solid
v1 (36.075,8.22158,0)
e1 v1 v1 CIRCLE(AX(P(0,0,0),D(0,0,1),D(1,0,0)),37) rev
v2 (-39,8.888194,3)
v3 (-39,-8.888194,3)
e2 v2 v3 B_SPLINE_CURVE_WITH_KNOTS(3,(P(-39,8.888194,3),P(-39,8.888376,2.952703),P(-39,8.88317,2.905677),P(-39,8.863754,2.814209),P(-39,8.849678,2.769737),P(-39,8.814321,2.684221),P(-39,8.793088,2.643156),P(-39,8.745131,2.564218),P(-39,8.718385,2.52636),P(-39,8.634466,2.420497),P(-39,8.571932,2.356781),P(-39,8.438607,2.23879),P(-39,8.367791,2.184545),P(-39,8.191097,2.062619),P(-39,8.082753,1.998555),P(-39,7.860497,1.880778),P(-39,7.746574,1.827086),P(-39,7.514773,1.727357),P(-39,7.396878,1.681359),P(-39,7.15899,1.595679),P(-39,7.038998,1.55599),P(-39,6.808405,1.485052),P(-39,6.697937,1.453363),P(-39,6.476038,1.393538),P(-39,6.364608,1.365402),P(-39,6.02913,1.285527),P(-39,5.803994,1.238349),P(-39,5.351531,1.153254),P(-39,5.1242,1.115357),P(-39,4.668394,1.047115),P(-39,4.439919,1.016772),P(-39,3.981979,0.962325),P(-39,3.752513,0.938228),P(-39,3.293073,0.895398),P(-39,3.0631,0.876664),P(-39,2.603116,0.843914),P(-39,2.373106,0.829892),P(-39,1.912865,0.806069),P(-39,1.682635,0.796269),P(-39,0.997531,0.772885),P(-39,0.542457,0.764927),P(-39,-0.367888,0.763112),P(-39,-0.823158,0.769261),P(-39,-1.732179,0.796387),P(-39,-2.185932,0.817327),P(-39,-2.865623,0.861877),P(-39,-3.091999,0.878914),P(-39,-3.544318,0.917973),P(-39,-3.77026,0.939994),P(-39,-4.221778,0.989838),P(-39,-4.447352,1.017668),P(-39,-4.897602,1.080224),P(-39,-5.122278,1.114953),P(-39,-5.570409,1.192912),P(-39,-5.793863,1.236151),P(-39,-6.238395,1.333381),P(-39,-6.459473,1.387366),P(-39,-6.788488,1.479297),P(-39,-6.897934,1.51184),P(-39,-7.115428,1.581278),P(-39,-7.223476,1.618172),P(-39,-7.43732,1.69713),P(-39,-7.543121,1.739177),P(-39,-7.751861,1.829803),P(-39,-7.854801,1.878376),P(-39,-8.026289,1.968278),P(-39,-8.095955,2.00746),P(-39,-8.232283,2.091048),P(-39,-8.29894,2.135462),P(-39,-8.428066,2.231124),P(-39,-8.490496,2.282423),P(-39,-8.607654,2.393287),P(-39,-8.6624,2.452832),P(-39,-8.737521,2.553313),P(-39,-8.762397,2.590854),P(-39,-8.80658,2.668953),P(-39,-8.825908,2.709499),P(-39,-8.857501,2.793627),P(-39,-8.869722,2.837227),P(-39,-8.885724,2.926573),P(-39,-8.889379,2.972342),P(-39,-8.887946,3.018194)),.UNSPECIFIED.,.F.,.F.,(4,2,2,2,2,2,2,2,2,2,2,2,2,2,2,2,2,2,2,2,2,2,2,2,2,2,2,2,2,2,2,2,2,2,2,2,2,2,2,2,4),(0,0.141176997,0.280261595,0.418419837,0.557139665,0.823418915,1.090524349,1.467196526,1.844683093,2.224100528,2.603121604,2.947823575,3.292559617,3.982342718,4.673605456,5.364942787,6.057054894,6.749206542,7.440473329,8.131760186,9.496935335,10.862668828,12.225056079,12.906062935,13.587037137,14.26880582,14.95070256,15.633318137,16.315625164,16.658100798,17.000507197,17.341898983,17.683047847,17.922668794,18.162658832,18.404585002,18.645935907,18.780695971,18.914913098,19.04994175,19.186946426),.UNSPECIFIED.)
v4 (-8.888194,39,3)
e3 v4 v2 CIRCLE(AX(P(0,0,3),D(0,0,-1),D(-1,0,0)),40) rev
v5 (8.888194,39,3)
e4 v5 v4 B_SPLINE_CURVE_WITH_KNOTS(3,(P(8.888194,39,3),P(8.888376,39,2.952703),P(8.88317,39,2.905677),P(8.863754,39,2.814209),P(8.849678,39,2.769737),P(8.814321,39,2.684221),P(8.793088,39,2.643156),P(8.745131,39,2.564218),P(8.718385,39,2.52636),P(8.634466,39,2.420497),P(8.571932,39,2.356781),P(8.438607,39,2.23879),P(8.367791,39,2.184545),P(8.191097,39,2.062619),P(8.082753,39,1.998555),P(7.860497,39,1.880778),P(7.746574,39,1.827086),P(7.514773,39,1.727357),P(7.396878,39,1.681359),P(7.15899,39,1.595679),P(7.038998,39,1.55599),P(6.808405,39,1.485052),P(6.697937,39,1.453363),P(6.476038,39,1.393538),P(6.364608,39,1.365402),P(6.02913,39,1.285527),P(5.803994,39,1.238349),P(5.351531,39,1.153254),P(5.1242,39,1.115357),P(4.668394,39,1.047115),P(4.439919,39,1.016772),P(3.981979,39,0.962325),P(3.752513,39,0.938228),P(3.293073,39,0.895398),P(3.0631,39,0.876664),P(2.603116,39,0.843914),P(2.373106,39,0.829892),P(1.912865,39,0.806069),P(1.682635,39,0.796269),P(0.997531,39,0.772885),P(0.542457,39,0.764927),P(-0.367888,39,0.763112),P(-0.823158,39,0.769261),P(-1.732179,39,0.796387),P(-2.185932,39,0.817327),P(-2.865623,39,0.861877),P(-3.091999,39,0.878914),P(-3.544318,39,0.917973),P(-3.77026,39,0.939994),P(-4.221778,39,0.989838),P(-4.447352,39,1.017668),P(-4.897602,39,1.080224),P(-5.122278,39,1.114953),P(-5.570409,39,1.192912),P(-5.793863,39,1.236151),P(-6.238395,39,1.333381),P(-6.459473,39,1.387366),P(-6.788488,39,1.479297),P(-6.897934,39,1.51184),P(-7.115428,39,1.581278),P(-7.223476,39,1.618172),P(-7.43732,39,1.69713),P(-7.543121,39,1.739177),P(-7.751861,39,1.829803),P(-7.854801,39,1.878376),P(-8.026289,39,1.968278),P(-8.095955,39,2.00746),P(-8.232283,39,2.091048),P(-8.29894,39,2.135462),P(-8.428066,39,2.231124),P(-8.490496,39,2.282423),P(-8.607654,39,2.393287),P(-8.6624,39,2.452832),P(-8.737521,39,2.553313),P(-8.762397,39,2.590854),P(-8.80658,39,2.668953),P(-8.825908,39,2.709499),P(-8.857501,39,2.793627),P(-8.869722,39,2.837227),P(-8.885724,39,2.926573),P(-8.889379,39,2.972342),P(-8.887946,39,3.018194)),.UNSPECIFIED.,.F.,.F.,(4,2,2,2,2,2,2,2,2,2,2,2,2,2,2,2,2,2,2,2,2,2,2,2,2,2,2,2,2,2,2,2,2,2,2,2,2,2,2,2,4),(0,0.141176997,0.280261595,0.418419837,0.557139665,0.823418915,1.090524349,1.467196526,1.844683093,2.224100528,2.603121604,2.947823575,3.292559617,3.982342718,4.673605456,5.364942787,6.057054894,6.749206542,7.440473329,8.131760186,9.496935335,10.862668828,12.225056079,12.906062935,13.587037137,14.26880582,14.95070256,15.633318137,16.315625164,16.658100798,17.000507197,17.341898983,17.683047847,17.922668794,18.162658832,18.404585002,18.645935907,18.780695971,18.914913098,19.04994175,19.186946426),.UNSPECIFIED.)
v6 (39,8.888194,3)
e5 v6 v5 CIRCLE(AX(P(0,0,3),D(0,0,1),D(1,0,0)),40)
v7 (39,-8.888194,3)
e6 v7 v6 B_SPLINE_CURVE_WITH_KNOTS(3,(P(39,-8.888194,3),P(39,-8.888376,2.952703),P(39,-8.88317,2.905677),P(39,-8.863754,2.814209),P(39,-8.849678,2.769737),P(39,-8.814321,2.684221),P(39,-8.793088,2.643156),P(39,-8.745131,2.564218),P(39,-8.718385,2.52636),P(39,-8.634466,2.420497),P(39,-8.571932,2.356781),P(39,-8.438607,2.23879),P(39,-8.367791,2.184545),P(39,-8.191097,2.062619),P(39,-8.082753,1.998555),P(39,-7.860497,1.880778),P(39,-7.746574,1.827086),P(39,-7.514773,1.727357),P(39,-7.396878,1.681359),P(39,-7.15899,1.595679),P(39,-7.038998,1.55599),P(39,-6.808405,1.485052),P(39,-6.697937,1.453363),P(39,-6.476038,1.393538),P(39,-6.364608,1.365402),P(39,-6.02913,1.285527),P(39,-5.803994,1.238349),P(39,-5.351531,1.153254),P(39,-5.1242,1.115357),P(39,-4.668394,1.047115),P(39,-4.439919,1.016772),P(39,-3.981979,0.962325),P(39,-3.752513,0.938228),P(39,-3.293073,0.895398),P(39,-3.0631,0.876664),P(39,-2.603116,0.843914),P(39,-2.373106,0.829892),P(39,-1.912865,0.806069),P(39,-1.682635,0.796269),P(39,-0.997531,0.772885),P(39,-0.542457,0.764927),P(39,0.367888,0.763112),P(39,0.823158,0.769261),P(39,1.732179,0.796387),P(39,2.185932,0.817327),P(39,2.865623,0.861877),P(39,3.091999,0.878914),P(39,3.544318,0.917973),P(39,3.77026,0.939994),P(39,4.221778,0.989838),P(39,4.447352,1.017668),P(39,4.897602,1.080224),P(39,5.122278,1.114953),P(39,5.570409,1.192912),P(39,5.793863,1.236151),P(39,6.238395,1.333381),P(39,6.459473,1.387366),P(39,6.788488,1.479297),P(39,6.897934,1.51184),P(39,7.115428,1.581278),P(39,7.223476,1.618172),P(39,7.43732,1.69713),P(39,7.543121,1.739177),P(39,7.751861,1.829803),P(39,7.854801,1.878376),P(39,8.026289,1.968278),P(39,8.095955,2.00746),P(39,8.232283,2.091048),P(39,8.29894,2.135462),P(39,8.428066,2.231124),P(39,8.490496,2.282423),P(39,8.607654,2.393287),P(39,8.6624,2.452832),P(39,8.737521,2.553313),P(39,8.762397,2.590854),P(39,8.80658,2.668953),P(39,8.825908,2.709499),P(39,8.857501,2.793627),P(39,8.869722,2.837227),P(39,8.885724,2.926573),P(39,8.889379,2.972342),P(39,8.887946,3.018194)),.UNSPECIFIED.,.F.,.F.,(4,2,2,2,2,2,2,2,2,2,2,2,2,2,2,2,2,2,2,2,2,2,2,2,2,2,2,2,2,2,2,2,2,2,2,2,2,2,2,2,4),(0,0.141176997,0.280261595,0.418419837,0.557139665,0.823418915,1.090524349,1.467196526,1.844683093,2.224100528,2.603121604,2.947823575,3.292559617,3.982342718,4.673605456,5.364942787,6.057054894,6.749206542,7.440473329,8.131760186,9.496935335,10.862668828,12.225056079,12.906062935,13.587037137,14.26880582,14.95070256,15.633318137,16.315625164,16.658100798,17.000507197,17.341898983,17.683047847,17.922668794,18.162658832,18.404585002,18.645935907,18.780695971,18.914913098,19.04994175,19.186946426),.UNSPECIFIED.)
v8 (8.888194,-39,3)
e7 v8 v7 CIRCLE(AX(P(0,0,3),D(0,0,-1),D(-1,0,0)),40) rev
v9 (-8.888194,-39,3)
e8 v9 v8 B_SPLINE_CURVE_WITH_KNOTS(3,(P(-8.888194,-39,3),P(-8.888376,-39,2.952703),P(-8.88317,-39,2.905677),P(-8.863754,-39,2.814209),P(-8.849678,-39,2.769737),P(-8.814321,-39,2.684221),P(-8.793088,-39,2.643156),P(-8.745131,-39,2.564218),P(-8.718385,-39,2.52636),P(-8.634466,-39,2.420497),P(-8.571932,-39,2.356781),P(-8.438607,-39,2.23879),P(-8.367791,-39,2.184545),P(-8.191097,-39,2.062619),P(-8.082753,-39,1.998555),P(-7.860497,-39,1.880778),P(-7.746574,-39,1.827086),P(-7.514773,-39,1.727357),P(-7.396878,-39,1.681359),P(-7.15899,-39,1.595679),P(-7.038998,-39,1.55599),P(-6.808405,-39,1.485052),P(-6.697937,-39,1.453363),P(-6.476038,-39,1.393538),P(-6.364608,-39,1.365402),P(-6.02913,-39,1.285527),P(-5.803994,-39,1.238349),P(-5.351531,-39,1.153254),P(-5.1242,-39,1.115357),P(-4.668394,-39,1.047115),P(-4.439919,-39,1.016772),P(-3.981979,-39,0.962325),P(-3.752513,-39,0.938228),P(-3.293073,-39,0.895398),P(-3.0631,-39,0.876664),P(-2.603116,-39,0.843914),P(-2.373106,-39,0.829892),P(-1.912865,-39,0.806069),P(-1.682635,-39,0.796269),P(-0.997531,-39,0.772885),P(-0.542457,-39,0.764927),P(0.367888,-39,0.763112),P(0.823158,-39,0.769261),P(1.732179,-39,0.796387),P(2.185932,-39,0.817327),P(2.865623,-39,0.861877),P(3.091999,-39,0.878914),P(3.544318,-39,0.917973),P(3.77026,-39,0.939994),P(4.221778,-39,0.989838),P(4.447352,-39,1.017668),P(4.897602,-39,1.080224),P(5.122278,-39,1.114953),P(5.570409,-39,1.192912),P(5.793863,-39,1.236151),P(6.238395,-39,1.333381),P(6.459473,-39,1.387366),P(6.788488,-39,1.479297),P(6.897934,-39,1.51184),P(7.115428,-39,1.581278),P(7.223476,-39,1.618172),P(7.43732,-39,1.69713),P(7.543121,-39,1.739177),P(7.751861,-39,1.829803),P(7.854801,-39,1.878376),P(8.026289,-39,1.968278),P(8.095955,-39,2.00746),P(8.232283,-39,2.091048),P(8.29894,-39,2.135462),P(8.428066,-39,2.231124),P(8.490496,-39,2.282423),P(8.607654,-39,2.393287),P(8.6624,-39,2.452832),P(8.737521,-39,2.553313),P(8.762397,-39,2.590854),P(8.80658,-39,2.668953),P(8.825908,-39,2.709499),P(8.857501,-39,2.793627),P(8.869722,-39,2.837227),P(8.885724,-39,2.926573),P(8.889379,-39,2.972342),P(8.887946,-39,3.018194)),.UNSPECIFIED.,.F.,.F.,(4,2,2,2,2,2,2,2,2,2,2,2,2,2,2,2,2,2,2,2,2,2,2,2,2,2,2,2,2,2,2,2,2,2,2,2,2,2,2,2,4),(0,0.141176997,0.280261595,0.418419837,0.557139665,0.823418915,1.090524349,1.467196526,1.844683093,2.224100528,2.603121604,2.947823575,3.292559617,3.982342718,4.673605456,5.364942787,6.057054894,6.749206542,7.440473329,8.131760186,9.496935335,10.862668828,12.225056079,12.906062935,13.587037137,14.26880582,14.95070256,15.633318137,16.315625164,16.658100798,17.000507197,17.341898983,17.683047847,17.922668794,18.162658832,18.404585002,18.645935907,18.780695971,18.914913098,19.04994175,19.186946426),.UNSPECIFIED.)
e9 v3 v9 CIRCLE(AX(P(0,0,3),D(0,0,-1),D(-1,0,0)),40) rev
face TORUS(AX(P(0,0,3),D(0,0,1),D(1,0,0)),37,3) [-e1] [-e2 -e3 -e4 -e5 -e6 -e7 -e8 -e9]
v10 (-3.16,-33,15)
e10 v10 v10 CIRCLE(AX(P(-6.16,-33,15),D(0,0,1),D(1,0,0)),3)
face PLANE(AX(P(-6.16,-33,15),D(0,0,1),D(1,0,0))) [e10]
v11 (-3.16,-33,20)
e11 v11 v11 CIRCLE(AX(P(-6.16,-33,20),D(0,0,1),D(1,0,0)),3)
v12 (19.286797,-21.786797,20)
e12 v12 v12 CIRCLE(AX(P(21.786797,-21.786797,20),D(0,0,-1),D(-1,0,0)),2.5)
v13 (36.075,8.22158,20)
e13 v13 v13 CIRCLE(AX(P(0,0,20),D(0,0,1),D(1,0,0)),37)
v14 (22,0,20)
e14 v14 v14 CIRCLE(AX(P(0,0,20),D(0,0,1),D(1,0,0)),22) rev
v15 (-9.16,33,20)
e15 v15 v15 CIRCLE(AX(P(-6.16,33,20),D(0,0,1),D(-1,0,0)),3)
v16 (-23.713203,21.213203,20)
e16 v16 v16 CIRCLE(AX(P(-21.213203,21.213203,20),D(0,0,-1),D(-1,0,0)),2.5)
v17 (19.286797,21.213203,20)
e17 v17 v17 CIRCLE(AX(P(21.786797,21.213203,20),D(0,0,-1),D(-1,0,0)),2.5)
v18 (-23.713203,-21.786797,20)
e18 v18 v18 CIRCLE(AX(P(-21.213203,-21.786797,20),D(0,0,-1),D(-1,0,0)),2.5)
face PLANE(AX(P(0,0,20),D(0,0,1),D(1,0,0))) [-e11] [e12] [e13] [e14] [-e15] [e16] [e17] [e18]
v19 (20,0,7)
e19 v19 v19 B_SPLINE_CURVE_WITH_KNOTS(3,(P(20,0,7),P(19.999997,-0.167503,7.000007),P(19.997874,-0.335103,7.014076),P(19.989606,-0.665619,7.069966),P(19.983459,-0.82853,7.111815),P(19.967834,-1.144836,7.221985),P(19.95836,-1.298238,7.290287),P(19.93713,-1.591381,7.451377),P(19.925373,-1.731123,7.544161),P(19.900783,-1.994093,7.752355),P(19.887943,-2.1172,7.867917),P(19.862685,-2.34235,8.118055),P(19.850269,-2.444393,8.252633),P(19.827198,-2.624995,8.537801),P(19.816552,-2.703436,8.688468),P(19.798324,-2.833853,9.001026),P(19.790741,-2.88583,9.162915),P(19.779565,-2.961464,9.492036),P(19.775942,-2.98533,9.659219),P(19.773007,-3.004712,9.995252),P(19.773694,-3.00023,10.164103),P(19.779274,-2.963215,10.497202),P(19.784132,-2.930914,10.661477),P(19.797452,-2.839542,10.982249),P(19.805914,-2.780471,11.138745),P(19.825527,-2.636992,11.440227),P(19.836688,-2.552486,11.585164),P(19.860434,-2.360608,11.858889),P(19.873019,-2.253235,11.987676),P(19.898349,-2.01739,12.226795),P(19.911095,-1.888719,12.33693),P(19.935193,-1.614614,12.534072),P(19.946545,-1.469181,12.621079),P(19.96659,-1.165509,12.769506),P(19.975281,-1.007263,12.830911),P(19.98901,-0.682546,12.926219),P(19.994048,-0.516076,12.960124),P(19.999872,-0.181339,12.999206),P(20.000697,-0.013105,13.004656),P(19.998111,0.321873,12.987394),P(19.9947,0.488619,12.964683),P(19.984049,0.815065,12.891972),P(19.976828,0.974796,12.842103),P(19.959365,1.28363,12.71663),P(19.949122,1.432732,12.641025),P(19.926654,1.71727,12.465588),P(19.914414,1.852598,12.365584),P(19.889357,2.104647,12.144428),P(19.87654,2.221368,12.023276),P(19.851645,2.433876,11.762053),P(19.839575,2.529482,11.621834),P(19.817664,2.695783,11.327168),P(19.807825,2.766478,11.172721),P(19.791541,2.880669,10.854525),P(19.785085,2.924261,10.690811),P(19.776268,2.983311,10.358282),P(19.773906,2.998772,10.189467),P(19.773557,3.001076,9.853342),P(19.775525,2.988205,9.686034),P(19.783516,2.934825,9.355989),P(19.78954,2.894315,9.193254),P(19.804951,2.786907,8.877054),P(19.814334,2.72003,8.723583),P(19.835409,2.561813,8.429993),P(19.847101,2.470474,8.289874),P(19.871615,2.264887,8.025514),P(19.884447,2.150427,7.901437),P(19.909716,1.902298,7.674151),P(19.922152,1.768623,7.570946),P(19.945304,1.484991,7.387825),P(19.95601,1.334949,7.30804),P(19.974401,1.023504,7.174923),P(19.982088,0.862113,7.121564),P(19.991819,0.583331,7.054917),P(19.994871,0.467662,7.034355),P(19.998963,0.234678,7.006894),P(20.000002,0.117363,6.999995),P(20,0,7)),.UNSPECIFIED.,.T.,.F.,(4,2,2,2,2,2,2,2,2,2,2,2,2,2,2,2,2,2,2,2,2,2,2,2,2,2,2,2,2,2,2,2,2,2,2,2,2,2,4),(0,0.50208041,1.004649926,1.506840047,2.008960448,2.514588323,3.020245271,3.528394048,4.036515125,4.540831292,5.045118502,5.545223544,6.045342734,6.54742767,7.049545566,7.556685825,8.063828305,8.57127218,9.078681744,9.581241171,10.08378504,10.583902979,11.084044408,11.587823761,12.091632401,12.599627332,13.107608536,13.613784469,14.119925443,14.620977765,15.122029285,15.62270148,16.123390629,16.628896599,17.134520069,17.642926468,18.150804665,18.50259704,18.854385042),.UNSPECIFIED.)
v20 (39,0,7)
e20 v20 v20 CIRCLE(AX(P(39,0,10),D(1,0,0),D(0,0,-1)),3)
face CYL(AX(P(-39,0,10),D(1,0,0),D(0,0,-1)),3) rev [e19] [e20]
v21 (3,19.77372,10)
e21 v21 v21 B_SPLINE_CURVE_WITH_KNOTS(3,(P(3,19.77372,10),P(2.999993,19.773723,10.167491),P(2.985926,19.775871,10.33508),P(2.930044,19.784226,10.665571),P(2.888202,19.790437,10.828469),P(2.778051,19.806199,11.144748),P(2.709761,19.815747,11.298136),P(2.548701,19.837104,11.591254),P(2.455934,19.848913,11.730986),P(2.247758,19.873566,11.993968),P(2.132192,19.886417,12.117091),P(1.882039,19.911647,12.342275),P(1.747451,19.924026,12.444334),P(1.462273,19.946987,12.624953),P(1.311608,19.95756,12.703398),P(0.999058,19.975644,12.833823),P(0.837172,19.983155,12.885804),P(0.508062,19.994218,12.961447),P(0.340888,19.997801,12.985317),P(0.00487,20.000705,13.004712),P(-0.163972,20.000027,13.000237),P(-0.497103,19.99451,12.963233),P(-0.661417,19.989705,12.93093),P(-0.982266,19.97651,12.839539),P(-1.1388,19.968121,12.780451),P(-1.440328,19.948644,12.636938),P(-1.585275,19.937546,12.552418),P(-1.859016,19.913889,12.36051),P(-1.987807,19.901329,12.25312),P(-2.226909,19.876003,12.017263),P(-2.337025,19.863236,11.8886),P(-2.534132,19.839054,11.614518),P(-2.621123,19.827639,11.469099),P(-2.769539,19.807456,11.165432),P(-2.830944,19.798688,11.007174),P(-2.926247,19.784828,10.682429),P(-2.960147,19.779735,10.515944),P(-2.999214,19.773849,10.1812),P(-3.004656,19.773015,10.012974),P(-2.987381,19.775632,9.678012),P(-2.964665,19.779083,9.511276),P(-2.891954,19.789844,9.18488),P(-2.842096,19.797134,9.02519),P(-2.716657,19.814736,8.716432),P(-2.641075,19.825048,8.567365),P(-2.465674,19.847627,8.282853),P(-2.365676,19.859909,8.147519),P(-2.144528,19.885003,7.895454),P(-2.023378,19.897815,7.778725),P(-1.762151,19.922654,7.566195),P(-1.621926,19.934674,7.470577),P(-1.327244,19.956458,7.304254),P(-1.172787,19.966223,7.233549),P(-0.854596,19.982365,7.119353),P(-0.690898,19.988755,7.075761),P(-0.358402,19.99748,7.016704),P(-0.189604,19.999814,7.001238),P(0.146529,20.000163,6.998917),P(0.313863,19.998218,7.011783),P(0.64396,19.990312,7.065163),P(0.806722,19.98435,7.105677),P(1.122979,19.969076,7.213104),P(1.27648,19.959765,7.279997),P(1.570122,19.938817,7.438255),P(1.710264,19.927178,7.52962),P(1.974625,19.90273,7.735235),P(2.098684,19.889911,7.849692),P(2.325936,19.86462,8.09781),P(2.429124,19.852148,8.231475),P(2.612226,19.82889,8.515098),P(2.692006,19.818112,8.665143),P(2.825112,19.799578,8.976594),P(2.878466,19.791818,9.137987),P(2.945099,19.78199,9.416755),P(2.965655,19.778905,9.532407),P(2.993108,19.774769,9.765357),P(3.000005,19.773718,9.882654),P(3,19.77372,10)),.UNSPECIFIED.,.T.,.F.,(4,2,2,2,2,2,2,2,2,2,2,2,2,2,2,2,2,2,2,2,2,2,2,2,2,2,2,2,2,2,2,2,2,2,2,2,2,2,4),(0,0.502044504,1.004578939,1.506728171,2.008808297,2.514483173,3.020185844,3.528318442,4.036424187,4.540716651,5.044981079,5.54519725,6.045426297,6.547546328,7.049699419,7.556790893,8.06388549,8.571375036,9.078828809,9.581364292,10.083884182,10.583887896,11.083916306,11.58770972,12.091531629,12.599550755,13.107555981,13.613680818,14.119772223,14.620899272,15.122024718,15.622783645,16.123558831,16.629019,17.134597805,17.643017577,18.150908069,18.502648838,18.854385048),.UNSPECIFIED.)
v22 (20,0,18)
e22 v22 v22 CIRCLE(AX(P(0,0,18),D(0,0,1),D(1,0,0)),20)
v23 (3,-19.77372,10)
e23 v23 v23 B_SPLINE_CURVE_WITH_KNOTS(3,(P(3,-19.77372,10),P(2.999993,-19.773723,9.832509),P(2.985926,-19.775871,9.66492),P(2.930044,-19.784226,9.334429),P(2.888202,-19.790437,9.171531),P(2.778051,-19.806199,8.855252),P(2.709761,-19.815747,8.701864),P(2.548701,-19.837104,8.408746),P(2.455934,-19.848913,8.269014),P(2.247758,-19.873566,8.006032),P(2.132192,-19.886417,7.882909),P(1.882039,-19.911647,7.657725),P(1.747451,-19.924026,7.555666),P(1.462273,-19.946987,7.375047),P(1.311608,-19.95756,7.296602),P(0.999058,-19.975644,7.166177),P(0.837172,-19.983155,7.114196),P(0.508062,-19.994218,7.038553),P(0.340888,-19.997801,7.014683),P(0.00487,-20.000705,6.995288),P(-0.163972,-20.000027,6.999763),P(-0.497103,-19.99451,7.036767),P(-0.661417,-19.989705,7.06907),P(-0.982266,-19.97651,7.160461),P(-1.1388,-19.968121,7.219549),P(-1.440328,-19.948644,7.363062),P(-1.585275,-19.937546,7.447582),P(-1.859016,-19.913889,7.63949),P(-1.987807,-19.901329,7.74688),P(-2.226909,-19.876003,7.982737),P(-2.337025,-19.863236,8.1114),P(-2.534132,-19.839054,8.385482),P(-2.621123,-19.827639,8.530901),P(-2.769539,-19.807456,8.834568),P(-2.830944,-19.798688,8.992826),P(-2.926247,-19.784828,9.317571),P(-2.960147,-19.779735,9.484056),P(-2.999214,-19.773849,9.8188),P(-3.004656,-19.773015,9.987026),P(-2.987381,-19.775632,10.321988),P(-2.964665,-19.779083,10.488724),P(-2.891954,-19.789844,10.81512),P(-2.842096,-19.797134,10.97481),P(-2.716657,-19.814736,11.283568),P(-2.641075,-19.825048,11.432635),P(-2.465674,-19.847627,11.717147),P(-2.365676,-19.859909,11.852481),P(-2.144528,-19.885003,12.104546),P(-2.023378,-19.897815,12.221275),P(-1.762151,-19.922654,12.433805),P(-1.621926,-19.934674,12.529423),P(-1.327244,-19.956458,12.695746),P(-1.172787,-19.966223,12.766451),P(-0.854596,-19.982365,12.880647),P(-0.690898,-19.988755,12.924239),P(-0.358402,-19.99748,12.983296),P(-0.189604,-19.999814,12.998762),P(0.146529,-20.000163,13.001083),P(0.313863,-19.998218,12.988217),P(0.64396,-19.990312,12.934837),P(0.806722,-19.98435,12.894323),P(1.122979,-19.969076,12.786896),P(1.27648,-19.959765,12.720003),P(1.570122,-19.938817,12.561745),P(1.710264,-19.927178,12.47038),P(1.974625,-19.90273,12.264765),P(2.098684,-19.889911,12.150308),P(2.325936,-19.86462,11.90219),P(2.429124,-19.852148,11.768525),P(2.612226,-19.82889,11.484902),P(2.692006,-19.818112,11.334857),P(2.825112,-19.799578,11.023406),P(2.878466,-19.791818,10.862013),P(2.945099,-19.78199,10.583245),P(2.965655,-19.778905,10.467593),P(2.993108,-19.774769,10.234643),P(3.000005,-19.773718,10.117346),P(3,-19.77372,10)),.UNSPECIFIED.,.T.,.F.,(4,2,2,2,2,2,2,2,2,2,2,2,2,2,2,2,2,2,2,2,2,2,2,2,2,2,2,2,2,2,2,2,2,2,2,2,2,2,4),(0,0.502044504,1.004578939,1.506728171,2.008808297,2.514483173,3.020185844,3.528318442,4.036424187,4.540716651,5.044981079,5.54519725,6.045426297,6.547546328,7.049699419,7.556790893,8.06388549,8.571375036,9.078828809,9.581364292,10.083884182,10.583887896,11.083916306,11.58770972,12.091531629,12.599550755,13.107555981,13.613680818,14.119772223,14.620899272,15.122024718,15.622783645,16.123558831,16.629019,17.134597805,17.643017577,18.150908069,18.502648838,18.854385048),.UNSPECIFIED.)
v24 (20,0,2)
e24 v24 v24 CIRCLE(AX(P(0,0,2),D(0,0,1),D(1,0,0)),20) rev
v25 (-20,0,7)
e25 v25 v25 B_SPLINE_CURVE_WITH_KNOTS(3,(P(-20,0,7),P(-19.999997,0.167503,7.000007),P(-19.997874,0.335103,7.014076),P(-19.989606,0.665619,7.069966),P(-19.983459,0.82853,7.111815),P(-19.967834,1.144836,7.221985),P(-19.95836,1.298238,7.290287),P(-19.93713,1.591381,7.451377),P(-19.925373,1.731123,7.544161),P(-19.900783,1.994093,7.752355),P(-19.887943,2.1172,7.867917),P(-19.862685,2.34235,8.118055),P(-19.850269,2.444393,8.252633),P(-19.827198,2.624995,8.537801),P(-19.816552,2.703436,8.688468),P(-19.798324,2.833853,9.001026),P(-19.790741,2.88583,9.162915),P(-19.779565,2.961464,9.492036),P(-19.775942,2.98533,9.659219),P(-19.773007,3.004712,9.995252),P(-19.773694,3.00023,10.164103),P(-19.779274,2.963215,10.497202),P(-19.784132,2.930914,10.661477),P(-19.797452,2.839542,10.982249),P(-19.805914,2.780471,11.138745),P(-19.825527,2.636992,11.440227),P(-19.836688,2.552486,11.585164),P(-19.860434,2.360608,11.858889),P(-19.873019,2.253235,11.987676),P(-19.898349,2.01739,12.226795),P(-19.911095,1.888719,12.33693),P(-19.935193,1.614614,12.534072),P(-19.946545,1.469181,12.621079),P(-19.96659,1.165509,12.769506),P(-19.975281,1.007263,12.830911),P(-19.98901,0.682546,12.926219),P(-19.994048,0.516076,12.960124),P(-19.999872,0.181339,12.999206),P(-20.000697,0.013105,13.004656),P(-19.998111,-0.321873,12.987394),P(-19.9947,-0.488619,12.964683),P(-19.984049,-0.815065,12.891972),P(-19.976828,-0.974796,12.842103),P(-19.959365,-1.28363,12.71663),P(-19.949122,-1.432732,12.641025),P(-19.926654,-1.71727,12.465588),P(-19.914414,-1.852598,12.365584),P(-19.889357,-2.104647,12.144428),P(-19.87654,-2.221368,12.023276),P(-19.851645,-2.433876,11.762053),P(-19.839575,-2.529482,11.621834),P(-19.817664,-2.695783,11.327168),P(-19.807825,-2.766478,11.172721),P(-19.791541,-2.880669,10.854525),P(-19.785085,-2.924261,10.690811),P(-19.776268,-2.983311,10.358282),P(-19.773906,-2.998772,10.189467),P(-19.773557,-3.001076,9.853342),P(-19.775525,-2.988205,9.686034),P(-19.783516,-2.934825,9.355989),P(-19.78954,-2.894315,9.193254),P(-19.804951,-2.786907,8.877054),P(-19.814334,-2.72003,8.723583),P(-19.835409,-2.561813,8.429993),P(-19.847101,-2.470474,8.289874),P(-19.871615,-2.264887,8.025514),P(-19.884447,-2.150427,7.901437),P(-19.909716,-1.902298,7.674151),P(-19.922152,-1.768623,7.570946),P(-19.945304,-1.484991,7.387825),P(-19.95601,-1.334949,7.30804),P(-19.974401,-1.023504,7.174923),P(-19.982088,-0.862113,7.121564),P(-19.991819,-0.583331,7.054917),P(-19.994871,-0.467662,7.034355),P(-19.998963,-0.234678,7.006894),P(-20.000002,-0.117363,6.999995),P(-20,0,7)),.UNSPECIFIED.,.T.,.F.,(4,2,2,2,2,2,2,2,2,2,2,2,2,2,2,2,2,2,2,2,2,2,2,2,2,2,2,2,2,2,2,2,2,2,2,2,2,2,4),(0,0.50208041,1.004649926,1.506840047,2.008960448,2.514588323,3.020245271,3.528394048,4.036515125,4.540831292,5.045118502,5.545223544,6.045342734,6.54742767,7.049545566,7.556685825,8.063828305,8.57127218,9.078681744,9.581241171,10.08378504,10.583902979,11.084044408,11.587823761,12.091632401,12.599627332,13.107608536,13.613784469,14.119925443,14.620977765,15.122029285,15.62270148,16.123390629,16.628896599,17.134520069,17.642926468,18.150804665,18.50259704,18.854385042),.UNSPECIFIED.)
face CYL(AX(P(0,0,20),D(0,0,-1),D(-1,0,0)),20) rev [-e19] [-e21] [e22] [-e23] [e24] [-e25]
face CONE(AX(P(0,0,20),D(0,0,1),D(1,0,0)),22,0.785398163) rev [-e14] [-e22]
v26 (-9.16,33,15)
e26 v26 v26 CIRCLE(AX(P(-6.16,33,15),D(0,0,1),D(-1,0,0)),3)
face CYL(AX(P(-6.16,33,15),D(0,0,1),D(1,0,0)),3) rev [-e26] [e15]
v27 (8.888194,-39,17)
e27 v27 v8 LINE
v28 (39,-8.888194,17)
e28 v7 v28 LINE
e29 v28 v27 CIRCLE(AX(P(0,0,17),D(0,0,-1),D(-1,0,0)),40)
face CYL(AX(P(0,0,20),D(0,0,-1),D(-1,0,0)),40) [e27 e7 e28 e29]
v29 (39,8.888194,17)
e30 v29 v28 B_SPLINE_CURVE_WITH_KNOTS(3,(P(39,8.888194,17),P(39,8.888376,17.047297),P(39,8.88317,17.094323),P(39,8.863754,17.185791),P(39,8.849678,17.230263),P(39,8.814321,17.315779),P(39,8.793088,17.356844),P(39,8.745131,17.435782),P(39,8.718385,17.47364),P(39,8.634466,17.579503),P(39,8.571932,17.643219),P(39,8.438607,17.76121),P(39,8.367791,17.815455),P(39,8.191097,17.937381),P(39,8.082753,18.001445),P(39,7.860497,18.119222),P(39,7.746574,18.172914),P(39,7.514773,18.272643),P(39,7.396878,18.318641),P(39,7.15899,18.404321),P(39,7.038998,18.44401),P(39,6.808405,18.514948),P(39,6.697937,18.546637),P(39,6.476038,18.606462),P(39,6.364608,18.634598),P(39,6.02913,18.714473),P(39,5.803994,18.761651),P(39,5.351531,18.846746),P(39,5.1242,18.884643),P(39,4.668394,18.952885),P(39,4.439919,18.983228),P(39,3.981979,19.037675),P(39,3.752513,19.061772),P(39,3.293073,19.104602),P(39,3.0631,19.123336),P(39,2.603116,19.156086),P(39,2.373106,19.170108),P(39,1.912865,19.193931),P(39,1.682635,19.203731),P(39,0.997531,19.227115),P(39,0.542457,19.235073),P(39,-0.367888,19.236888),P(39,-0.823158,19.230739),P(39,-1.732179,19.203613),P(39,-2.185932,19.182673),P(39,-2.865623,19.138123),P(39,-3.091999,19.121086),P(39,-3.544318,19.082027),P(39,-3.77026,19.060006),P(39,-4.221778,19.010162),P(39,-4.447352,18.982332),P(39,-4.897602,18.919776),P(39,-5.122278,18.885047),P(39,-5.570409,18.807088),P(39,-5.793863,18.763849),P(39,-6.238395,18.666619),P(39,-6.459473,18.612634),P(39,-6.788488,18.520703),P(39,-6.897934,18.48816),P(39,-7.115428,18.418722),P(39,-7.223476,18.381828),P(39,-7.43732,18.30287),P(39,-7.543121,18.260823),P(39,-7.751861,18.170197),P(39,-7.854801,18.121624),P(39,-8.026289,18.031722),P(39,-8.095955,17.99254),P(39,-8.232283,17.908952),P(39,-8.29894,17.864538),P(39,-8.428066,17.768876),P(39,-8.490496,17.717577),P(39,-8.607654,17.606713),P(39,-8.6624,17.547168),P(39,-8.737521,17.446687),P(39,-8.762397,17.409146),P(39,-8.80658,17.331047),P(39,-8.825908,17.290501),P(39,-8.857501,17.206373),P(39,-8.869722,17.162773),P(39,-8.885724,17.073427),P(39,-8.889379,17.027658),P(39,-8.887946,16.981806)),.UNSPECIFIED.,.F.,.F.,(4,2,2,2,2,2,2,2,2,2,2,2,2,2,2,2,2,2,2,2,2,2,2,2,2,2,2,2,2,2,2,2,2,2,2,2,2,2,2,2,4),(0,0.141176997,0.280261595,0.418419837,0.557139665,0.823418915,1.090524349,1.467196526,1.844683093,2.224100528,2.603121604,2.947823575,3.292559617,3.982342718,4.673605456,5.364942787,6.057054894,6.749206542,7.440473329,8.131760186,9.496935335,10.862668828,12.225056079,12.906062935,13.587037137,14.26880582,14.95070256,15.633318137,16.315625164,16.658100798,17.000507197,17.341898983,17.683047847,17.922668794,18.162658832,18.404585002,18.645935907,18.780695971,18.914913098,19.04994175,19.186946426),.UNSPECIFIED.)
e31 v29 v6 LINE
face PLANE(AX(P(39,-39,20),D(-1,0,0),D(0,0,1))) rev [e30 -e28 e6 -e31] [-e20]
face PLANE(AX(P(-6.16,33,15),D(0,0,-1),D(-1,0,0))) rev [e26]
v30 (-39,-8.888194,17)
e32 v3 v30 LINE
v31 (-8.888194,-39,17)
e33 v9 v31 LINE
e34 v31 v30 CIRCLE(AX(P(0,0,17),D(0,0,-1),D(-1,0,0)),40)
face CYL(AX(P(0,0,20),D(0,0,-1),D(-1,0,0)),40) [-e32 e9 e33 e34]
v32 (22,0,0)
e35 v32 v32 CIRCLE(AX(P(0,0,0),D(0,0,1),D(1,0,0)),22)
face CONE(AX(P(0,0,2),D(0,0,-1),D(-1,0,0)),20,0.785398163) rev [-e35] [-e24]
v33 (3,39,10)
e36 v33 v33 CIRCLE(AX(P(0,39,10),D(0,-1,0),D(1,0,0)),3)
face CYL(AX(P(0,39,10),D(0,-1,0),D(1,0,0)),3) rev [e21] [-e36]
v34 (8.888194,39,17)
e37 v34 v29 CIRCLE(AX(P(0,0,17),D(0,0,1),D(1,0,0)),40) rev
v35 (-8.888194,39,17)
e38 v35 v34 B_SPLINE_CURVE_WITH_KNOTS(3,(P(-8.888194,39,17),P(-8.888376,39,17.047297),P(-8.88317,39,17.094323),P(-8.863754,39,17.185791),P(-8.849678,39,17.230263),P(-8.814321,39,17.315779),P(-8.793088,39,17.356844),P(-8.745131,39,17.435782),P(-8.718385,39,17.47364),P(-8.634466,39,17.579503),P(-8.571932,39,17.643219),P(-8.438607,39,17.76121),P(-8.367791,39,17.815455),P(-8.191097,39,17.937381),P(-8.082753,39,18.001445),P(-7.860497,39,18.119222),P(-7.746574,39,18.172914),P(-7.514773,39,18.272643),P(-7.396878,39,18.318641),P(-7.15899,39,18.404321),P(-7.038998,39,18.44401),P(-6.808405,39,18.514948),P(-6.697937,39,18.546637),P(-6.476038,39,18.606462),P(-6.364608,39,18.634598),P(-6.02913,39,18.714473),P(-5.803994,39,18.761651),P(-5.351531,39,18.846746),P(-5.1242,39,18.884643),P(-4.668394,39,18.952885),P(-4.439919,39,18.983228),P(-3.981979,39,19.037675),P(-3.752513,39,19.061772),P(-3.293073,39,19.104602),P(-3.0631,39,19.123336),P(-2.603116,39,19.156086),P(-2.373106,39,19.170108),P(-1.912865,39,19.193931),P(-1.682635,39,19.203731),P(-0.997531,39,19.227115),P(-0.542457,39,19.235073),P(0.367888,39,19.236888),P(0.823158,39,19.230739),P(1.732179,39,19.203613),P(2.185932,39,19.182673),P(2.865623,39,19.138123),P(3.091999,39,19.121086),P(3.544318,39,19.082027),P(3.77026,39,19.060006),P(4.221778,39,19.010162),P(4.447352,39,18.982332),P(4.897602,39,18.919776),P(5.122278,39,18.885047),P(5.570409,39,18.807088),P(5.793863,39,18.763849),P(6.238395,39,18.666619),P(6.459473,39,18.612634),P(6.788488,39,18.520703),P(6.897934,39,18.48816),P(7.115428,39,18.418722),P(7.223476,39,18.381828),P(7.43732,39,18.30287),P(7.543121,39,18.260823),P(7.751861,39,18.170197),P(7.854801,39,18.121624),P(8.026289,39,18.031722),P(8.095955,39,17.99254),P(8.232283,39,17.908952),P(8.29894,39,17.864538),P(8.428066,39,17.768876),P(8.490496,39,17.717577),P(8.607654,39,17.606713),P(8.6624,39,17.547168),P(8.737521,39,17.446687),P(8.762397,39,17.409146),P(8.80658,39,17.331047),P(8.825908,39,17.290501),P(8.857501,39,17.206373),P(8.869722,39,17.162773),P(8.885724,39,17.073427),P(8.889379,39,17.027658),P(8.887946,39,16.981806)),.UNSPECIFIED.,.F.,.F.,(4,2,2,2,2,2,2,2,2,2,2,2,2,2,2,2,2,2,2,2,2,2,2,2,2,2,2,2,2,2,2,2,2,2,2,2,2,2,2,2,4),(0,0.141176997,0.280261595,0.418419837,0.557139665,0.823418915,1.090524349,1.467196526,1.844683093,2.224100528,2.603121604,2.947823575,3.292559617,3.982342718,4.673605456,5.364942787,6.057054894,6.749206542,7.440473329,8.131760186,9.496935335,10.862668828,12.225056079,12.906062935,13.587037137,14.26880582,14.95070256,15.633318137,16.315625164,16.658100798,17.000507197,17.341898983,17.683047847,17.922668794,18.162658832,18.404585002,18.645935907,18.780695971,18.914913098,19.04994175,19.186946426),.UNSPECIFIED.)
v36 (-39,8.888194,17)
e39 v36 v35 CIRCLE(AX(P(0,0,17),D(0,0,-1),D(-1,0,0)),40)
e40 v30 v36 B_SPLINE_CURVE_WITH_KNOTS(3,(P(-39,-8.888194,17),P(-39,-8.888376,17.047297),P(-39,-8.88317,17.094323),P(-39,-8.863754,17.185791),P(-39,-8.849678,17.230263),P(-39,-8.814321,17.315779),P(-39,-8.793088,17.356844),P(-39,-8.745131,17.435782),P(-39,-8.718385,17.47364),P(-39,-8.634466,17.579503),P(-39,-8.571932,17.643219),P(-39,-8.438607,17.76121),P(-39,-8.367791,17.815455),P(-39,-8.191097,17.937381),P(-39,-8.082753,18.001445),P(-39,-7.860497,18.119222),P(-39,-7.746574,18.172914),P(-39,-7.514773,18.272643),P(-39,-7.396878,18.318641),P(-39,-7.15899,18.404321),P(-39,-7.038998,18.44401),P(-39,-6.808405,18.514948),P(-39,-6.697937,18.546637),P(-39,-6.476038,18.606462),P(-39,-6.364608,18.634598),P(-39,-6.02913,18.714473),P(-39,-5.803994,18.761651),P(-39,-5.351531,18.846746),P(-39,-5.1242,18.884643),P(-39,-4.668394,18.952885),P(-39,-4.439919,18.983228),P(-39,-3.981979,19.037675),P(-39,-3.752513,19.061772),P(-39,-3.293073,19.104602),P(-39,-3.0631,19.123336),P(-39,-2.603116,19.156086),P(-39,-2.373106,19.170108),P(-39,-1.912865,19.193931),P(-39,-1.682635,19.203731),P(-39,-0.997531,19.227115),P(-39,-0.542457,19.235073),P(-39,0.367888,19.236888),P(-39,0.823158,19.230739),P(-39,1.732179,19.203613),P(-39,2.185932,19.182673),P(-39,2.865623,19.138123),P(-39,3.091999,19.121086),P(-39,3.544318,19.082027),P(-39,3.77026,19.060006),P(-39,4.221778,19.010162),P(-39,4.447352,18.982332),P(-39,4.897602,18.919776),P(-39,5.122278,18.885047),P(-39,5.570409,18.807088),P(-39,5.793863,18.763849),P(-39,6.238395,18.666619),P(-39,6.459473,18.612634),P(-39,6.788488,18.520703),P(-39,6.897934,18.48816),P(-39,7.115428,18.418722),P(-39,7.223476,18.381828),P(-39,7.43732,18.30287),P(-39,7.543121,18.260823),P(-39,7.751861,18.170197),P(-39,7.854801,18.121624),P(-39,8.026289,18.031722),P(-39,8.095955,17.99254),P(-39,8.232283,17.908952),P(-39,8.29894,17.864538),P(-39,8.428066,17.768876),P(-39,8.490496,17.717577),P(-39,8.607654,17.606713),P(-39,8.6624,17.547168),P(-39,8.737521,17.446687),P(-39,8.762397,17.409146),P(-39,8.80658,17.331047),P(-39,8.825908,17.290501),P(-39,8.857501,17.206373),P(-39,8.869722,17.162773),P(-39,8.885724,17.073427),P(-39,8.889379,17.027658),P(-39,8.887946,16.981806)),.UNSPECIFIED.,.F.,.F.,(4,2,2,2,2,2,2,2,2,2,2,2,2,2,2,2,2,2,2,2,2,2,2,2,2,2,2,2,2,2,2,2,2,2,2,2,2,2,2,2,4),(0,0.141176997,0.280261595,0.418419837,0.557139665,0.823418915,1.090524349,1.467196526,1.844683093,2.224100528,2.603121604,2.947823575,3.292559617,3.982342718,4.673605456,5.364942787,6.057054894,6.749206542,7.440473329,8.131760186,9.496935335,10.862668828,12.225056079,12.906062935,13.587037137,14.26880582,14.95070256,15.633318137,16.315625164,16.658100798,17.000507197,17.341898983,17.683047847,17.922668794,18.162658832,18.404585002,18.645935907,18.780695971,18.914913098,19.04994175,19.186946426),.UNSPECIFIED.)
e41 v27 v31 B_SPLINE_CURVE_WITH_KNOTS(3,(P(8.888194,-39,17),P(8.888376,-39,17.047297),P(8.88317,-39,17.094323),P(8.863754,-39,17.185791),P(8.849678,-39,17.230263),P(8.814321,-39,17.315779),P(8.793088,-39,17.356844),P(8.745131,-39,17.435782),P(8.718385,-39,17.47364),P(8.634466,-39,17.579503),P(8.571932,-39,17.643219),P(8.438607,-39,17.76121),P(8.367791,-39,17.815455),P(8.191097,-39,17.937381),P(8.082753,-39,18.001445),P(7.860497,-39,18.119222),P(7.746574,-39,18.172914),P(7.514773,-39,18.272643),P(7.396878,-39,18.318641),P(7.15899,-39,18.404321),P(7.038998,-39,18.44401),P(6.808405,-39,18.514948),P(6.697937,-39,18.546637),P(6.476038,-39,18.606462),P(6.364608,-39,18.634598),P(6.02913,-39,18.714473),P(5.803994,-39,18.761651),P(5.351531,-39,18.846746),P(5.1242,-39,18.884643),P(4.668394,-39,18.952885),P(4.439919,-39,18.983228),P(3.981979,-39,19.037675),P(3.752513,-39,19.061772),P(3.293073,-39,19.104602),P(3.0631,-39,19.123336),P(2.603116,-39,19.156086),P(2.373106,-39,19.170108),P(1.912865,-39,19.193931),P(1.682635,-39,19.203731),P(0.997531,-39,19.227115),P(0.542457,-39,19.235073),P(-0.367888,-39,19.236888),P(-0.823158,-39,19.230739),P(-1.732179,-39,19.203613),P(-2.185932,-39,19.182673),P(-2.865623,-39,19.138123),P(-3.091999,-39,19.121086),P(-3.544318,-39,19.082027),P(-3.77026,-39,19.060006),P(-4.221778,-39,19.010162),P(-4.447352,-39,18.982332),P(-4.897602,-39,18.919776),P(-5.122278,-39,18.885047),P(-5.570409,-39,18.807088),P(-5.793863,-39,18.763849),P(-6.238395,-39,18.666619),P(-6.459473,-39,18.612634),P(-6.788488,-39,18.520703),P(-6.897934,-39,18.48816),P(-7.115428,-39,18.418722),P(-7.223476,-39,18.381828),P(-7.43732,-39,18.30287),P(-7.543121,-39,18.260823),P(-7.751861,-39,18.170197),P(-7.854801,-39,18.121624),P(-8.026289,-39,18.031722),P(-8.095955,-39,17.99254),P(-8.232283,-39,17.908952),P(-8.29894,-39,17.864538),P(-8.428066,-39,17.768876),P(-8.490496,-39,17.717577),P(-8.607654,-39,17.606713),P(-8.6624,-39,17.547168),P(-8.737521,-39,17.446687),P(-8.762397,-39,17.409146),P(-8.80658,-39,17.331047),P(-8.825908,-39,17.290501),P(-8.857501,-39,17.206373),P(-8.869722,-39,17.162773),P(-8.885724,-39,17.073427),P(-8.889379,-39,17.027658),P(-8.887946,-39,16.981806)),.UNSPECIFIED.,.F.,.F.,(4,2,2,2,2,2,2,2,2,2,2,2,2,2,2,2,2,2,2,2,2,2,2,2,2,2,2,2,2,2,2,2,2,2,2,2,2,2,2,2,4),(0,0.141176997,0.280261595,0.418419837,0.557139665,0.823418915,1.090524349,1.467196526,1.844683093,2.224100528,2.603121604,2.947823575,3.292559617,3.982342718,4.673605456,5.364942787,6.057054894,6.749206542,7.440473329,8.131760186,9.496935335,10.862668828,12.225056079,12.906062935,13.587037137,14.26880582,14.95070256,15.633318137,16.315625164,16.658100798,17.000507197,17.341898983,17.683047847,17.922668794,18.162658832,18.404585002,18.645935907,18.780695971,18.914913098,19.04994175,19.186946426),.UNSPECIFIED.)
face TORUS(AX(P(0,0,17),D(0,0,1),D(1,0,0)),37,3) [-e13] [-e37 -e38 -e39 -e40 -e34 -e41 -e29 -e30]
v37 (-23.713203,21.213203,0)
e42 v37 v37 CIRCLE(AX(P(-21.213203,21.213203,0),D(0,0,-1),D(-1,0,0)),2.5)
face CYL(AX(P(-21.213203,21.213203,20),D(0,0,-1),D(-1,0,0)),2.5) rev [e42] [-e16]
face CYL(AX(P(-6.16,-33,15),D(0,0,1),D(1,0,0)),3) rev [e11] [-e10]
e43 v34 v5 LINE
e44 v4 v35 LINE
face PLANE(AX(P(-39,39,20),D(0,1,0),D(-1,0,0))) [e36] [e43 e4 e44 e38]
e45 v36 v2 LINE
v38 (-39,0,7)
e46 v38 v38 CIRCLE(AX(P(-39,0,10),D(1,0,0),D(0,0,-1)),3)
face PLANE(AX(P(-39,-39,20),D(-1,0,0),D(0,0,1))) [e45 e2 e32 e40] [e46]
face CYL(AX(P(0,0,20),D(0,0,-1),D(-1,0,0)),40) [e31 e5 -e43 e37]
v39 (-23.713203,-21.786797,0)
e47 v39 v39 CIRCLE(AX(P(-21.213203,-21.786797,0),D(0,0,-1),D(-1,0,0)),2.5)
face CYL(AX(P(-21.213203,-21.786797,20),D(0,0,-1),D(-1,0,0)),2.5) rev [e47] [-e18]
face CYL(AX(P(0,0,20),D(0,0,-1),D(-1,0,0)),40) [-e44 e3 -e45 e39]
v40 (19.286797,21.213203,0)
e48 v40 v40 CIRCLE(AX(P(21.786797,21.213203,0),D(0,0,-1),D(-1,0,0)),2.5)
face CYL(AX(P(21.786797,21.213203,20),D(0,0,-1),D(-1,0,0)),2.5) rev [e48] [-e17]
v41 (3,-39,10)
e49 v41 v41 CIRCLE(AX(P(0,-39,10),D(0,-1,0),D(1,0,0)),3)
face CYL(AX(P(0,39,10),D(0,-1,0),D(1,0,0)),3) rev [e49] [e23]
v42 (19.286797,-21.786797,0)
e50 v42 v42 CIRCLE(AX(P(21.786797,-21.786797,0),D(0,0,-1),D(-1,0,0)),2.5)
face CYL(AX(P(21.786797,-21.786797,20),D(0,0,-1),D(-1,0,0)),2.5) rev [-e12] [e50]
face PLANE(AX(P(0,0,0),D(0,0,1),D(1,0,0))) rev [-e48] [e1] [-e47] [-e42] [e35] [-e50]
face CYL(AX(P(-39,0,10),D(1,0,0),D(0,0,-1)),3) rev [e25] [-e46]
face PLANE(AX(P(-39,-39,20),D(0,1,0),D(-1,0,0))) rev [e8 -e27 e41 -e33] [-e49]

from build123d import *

# Parameters (mm, degrees)
SKETCH1_R           = 40
BOSS_EXTRUDE1_DEPTH = 20
SKETCH2_W           = 91.95154217
SKETCH2_H           = 92.440305864
SKETCH2_W_2         = 78
SKETCH2_H_2         = 78
CUT_EXTRUDE3_DEPTH  = 61
SKETCH3_R           = 2.5
CUT_EXTRUDE5_DEPTH  = 59.668560575
SKETCH5_R           = 3
CUT_EXTRUDE6_DEPTH  = 90.470665584
SKETCH6_R           = 3
CUT_EXTRUDE7_DEPTH  = 90.470665584
SKETCH7_R           = 20
CUT_EXTRUDE8_DEPTH  = 59.668560575
CHAMFER1_SIZE       = 2
SKETCH8_R           = 3
CUT_EXTRUDE9_DEPTH  = 5


with BuildPart() as part:
    # Sketch1 → Boss-Extrude1 (new body)
    with BuildSketch(Plane.XY):
        Circle(SKETCH1_R)
    extrude(amount=BOSS_EXTRUDE1_DEPTH)

    # Sketch2 → Cut-Extrude3 (cut, through all)
    with BuildSketch(Plane(origin=(0, 0, 0), x_dir=(-1, 0, 0), z_dir=(0, 0, -1))):
        Rectangle(SKETCH2_W, SKETCH2_H)
        Rectangle(SKETCH2_W_2, SKETCH2_H_2, mode=Mode.SUBTRACT)
    extrude(amount=-CUT_EXTRUDE3_DEPTH, mode=Mode.SUBTRACT)

    # Sketch3 → Cut-Extrude5 (cut, through all)
    with BuildSketch(Plane(origin=(0, 0, 0), x_dir=(-1, 0, 0), z_dir=(0, 0, -1))):
        with Locations((21.213203436, 21.213203436)):
            Circle(SKETCH3_R)
        with Locations((21.213203436, -21.786796564)):
            Circle(SKETCH3_R)
        with Locations((-21.786796564, -21.786796564)):
            Circle(SKETCH3_R)
        with Locations((-21.786796564, 21.213203436)):
            Circle(SKETCH3_R)
    extrude(amount=-CUT_EXTRUDE5_DEPTH, mode=Mode.SUBTRACT)

    # Sketch5 → Cut-Extrude6 (cut, through all)
    with BuildSketch(Plane(origin=(39, 0, 0), x_dir=(0, 0, -1), z_dir=(1, 0, 0))):
        with Locations((-10, 0)):
            Circle(SKETCH5_R)
    extrude(amount=-CUT_EXTRUDE6_DEPTH, mode=Mode.SUBTRACT)

    # Sketch6 → Cut-Extrude7 (cut, through all)
    with BuildSketch(Plane.XZ.offset(39)):
        with Locations((0, 10)):
            Circle(SKETCH6_R)
    extrude(amount=-CUT_EXTRUDE7_DEPTH, mode=Mode.SUBTRACT)

    # Sketch7 → Cut-Extrude8 (cut, through all)
    with BuildSketch(Plane(origin=(0, 0, 0), x_dir=(-1, 0, 0), z_dir=(0, 0, -1))):
        Circle(SKETCH7_R)
    extrude(amount=-CUT_EXTRUDE8_DEPTH, mode=Mode.SUBTRACT)

    # Fillet2: read off the stored shape, not the designer's step
    # Fillet2 outline → Fillet2 (revolve, cut)
    with BuildSketch(Plane.XZ):
        with BuildLine():
            ThreePointArc((37, 20), (39.121320386, 19.121320302), (40, 16.999999881))
            Line((40, 16.999999881), (40, 20))
            Line((40, 20), (37, 20))
        make_face()
        with BuildLine():
            Line((40, 0), (40, 3.000000119))
            ThreePointArc((40, 3.000000119), (39.121320386, 0.878679698), (37, 0))
            Line((37, 0), (40, 0))
        make_face()
    revolve(axis=Axis((0, 0, 0), (0, 0, 1)), mode=Mode.SUBTRACT)

    # Chamfer1
    chamfer1_edges = [part.edges().sort_by_distance(p)[0] for p in [
        (20, 0, 20),
        (20, 0, 0),
    ]]
    chamfer(chamfer1_edges, length=CHAMFER1_SIZE)

    # Sketch8 → Cut-Extrude9 (cut)
    with BuildSketch(Plane(origin=(150.63801623, 159.049980591, 20), x_dir=(0, -1, 0), z_dir=(0, 0, 1))):
        with Locations(Location((192.049980649, -156.798016257, 0), (0, 0, 90))):
            Circle(SKETCH8_R)
        with Locations(Location((126.049980533, -156.798016257, 0), (0, 0, 270))):
            Circle(SKETCH8_R)
    extrude(amount=-CUT_EXTRUDE9_DEPTH, mode=Mode.SUBTRACT)


solid = part.part
